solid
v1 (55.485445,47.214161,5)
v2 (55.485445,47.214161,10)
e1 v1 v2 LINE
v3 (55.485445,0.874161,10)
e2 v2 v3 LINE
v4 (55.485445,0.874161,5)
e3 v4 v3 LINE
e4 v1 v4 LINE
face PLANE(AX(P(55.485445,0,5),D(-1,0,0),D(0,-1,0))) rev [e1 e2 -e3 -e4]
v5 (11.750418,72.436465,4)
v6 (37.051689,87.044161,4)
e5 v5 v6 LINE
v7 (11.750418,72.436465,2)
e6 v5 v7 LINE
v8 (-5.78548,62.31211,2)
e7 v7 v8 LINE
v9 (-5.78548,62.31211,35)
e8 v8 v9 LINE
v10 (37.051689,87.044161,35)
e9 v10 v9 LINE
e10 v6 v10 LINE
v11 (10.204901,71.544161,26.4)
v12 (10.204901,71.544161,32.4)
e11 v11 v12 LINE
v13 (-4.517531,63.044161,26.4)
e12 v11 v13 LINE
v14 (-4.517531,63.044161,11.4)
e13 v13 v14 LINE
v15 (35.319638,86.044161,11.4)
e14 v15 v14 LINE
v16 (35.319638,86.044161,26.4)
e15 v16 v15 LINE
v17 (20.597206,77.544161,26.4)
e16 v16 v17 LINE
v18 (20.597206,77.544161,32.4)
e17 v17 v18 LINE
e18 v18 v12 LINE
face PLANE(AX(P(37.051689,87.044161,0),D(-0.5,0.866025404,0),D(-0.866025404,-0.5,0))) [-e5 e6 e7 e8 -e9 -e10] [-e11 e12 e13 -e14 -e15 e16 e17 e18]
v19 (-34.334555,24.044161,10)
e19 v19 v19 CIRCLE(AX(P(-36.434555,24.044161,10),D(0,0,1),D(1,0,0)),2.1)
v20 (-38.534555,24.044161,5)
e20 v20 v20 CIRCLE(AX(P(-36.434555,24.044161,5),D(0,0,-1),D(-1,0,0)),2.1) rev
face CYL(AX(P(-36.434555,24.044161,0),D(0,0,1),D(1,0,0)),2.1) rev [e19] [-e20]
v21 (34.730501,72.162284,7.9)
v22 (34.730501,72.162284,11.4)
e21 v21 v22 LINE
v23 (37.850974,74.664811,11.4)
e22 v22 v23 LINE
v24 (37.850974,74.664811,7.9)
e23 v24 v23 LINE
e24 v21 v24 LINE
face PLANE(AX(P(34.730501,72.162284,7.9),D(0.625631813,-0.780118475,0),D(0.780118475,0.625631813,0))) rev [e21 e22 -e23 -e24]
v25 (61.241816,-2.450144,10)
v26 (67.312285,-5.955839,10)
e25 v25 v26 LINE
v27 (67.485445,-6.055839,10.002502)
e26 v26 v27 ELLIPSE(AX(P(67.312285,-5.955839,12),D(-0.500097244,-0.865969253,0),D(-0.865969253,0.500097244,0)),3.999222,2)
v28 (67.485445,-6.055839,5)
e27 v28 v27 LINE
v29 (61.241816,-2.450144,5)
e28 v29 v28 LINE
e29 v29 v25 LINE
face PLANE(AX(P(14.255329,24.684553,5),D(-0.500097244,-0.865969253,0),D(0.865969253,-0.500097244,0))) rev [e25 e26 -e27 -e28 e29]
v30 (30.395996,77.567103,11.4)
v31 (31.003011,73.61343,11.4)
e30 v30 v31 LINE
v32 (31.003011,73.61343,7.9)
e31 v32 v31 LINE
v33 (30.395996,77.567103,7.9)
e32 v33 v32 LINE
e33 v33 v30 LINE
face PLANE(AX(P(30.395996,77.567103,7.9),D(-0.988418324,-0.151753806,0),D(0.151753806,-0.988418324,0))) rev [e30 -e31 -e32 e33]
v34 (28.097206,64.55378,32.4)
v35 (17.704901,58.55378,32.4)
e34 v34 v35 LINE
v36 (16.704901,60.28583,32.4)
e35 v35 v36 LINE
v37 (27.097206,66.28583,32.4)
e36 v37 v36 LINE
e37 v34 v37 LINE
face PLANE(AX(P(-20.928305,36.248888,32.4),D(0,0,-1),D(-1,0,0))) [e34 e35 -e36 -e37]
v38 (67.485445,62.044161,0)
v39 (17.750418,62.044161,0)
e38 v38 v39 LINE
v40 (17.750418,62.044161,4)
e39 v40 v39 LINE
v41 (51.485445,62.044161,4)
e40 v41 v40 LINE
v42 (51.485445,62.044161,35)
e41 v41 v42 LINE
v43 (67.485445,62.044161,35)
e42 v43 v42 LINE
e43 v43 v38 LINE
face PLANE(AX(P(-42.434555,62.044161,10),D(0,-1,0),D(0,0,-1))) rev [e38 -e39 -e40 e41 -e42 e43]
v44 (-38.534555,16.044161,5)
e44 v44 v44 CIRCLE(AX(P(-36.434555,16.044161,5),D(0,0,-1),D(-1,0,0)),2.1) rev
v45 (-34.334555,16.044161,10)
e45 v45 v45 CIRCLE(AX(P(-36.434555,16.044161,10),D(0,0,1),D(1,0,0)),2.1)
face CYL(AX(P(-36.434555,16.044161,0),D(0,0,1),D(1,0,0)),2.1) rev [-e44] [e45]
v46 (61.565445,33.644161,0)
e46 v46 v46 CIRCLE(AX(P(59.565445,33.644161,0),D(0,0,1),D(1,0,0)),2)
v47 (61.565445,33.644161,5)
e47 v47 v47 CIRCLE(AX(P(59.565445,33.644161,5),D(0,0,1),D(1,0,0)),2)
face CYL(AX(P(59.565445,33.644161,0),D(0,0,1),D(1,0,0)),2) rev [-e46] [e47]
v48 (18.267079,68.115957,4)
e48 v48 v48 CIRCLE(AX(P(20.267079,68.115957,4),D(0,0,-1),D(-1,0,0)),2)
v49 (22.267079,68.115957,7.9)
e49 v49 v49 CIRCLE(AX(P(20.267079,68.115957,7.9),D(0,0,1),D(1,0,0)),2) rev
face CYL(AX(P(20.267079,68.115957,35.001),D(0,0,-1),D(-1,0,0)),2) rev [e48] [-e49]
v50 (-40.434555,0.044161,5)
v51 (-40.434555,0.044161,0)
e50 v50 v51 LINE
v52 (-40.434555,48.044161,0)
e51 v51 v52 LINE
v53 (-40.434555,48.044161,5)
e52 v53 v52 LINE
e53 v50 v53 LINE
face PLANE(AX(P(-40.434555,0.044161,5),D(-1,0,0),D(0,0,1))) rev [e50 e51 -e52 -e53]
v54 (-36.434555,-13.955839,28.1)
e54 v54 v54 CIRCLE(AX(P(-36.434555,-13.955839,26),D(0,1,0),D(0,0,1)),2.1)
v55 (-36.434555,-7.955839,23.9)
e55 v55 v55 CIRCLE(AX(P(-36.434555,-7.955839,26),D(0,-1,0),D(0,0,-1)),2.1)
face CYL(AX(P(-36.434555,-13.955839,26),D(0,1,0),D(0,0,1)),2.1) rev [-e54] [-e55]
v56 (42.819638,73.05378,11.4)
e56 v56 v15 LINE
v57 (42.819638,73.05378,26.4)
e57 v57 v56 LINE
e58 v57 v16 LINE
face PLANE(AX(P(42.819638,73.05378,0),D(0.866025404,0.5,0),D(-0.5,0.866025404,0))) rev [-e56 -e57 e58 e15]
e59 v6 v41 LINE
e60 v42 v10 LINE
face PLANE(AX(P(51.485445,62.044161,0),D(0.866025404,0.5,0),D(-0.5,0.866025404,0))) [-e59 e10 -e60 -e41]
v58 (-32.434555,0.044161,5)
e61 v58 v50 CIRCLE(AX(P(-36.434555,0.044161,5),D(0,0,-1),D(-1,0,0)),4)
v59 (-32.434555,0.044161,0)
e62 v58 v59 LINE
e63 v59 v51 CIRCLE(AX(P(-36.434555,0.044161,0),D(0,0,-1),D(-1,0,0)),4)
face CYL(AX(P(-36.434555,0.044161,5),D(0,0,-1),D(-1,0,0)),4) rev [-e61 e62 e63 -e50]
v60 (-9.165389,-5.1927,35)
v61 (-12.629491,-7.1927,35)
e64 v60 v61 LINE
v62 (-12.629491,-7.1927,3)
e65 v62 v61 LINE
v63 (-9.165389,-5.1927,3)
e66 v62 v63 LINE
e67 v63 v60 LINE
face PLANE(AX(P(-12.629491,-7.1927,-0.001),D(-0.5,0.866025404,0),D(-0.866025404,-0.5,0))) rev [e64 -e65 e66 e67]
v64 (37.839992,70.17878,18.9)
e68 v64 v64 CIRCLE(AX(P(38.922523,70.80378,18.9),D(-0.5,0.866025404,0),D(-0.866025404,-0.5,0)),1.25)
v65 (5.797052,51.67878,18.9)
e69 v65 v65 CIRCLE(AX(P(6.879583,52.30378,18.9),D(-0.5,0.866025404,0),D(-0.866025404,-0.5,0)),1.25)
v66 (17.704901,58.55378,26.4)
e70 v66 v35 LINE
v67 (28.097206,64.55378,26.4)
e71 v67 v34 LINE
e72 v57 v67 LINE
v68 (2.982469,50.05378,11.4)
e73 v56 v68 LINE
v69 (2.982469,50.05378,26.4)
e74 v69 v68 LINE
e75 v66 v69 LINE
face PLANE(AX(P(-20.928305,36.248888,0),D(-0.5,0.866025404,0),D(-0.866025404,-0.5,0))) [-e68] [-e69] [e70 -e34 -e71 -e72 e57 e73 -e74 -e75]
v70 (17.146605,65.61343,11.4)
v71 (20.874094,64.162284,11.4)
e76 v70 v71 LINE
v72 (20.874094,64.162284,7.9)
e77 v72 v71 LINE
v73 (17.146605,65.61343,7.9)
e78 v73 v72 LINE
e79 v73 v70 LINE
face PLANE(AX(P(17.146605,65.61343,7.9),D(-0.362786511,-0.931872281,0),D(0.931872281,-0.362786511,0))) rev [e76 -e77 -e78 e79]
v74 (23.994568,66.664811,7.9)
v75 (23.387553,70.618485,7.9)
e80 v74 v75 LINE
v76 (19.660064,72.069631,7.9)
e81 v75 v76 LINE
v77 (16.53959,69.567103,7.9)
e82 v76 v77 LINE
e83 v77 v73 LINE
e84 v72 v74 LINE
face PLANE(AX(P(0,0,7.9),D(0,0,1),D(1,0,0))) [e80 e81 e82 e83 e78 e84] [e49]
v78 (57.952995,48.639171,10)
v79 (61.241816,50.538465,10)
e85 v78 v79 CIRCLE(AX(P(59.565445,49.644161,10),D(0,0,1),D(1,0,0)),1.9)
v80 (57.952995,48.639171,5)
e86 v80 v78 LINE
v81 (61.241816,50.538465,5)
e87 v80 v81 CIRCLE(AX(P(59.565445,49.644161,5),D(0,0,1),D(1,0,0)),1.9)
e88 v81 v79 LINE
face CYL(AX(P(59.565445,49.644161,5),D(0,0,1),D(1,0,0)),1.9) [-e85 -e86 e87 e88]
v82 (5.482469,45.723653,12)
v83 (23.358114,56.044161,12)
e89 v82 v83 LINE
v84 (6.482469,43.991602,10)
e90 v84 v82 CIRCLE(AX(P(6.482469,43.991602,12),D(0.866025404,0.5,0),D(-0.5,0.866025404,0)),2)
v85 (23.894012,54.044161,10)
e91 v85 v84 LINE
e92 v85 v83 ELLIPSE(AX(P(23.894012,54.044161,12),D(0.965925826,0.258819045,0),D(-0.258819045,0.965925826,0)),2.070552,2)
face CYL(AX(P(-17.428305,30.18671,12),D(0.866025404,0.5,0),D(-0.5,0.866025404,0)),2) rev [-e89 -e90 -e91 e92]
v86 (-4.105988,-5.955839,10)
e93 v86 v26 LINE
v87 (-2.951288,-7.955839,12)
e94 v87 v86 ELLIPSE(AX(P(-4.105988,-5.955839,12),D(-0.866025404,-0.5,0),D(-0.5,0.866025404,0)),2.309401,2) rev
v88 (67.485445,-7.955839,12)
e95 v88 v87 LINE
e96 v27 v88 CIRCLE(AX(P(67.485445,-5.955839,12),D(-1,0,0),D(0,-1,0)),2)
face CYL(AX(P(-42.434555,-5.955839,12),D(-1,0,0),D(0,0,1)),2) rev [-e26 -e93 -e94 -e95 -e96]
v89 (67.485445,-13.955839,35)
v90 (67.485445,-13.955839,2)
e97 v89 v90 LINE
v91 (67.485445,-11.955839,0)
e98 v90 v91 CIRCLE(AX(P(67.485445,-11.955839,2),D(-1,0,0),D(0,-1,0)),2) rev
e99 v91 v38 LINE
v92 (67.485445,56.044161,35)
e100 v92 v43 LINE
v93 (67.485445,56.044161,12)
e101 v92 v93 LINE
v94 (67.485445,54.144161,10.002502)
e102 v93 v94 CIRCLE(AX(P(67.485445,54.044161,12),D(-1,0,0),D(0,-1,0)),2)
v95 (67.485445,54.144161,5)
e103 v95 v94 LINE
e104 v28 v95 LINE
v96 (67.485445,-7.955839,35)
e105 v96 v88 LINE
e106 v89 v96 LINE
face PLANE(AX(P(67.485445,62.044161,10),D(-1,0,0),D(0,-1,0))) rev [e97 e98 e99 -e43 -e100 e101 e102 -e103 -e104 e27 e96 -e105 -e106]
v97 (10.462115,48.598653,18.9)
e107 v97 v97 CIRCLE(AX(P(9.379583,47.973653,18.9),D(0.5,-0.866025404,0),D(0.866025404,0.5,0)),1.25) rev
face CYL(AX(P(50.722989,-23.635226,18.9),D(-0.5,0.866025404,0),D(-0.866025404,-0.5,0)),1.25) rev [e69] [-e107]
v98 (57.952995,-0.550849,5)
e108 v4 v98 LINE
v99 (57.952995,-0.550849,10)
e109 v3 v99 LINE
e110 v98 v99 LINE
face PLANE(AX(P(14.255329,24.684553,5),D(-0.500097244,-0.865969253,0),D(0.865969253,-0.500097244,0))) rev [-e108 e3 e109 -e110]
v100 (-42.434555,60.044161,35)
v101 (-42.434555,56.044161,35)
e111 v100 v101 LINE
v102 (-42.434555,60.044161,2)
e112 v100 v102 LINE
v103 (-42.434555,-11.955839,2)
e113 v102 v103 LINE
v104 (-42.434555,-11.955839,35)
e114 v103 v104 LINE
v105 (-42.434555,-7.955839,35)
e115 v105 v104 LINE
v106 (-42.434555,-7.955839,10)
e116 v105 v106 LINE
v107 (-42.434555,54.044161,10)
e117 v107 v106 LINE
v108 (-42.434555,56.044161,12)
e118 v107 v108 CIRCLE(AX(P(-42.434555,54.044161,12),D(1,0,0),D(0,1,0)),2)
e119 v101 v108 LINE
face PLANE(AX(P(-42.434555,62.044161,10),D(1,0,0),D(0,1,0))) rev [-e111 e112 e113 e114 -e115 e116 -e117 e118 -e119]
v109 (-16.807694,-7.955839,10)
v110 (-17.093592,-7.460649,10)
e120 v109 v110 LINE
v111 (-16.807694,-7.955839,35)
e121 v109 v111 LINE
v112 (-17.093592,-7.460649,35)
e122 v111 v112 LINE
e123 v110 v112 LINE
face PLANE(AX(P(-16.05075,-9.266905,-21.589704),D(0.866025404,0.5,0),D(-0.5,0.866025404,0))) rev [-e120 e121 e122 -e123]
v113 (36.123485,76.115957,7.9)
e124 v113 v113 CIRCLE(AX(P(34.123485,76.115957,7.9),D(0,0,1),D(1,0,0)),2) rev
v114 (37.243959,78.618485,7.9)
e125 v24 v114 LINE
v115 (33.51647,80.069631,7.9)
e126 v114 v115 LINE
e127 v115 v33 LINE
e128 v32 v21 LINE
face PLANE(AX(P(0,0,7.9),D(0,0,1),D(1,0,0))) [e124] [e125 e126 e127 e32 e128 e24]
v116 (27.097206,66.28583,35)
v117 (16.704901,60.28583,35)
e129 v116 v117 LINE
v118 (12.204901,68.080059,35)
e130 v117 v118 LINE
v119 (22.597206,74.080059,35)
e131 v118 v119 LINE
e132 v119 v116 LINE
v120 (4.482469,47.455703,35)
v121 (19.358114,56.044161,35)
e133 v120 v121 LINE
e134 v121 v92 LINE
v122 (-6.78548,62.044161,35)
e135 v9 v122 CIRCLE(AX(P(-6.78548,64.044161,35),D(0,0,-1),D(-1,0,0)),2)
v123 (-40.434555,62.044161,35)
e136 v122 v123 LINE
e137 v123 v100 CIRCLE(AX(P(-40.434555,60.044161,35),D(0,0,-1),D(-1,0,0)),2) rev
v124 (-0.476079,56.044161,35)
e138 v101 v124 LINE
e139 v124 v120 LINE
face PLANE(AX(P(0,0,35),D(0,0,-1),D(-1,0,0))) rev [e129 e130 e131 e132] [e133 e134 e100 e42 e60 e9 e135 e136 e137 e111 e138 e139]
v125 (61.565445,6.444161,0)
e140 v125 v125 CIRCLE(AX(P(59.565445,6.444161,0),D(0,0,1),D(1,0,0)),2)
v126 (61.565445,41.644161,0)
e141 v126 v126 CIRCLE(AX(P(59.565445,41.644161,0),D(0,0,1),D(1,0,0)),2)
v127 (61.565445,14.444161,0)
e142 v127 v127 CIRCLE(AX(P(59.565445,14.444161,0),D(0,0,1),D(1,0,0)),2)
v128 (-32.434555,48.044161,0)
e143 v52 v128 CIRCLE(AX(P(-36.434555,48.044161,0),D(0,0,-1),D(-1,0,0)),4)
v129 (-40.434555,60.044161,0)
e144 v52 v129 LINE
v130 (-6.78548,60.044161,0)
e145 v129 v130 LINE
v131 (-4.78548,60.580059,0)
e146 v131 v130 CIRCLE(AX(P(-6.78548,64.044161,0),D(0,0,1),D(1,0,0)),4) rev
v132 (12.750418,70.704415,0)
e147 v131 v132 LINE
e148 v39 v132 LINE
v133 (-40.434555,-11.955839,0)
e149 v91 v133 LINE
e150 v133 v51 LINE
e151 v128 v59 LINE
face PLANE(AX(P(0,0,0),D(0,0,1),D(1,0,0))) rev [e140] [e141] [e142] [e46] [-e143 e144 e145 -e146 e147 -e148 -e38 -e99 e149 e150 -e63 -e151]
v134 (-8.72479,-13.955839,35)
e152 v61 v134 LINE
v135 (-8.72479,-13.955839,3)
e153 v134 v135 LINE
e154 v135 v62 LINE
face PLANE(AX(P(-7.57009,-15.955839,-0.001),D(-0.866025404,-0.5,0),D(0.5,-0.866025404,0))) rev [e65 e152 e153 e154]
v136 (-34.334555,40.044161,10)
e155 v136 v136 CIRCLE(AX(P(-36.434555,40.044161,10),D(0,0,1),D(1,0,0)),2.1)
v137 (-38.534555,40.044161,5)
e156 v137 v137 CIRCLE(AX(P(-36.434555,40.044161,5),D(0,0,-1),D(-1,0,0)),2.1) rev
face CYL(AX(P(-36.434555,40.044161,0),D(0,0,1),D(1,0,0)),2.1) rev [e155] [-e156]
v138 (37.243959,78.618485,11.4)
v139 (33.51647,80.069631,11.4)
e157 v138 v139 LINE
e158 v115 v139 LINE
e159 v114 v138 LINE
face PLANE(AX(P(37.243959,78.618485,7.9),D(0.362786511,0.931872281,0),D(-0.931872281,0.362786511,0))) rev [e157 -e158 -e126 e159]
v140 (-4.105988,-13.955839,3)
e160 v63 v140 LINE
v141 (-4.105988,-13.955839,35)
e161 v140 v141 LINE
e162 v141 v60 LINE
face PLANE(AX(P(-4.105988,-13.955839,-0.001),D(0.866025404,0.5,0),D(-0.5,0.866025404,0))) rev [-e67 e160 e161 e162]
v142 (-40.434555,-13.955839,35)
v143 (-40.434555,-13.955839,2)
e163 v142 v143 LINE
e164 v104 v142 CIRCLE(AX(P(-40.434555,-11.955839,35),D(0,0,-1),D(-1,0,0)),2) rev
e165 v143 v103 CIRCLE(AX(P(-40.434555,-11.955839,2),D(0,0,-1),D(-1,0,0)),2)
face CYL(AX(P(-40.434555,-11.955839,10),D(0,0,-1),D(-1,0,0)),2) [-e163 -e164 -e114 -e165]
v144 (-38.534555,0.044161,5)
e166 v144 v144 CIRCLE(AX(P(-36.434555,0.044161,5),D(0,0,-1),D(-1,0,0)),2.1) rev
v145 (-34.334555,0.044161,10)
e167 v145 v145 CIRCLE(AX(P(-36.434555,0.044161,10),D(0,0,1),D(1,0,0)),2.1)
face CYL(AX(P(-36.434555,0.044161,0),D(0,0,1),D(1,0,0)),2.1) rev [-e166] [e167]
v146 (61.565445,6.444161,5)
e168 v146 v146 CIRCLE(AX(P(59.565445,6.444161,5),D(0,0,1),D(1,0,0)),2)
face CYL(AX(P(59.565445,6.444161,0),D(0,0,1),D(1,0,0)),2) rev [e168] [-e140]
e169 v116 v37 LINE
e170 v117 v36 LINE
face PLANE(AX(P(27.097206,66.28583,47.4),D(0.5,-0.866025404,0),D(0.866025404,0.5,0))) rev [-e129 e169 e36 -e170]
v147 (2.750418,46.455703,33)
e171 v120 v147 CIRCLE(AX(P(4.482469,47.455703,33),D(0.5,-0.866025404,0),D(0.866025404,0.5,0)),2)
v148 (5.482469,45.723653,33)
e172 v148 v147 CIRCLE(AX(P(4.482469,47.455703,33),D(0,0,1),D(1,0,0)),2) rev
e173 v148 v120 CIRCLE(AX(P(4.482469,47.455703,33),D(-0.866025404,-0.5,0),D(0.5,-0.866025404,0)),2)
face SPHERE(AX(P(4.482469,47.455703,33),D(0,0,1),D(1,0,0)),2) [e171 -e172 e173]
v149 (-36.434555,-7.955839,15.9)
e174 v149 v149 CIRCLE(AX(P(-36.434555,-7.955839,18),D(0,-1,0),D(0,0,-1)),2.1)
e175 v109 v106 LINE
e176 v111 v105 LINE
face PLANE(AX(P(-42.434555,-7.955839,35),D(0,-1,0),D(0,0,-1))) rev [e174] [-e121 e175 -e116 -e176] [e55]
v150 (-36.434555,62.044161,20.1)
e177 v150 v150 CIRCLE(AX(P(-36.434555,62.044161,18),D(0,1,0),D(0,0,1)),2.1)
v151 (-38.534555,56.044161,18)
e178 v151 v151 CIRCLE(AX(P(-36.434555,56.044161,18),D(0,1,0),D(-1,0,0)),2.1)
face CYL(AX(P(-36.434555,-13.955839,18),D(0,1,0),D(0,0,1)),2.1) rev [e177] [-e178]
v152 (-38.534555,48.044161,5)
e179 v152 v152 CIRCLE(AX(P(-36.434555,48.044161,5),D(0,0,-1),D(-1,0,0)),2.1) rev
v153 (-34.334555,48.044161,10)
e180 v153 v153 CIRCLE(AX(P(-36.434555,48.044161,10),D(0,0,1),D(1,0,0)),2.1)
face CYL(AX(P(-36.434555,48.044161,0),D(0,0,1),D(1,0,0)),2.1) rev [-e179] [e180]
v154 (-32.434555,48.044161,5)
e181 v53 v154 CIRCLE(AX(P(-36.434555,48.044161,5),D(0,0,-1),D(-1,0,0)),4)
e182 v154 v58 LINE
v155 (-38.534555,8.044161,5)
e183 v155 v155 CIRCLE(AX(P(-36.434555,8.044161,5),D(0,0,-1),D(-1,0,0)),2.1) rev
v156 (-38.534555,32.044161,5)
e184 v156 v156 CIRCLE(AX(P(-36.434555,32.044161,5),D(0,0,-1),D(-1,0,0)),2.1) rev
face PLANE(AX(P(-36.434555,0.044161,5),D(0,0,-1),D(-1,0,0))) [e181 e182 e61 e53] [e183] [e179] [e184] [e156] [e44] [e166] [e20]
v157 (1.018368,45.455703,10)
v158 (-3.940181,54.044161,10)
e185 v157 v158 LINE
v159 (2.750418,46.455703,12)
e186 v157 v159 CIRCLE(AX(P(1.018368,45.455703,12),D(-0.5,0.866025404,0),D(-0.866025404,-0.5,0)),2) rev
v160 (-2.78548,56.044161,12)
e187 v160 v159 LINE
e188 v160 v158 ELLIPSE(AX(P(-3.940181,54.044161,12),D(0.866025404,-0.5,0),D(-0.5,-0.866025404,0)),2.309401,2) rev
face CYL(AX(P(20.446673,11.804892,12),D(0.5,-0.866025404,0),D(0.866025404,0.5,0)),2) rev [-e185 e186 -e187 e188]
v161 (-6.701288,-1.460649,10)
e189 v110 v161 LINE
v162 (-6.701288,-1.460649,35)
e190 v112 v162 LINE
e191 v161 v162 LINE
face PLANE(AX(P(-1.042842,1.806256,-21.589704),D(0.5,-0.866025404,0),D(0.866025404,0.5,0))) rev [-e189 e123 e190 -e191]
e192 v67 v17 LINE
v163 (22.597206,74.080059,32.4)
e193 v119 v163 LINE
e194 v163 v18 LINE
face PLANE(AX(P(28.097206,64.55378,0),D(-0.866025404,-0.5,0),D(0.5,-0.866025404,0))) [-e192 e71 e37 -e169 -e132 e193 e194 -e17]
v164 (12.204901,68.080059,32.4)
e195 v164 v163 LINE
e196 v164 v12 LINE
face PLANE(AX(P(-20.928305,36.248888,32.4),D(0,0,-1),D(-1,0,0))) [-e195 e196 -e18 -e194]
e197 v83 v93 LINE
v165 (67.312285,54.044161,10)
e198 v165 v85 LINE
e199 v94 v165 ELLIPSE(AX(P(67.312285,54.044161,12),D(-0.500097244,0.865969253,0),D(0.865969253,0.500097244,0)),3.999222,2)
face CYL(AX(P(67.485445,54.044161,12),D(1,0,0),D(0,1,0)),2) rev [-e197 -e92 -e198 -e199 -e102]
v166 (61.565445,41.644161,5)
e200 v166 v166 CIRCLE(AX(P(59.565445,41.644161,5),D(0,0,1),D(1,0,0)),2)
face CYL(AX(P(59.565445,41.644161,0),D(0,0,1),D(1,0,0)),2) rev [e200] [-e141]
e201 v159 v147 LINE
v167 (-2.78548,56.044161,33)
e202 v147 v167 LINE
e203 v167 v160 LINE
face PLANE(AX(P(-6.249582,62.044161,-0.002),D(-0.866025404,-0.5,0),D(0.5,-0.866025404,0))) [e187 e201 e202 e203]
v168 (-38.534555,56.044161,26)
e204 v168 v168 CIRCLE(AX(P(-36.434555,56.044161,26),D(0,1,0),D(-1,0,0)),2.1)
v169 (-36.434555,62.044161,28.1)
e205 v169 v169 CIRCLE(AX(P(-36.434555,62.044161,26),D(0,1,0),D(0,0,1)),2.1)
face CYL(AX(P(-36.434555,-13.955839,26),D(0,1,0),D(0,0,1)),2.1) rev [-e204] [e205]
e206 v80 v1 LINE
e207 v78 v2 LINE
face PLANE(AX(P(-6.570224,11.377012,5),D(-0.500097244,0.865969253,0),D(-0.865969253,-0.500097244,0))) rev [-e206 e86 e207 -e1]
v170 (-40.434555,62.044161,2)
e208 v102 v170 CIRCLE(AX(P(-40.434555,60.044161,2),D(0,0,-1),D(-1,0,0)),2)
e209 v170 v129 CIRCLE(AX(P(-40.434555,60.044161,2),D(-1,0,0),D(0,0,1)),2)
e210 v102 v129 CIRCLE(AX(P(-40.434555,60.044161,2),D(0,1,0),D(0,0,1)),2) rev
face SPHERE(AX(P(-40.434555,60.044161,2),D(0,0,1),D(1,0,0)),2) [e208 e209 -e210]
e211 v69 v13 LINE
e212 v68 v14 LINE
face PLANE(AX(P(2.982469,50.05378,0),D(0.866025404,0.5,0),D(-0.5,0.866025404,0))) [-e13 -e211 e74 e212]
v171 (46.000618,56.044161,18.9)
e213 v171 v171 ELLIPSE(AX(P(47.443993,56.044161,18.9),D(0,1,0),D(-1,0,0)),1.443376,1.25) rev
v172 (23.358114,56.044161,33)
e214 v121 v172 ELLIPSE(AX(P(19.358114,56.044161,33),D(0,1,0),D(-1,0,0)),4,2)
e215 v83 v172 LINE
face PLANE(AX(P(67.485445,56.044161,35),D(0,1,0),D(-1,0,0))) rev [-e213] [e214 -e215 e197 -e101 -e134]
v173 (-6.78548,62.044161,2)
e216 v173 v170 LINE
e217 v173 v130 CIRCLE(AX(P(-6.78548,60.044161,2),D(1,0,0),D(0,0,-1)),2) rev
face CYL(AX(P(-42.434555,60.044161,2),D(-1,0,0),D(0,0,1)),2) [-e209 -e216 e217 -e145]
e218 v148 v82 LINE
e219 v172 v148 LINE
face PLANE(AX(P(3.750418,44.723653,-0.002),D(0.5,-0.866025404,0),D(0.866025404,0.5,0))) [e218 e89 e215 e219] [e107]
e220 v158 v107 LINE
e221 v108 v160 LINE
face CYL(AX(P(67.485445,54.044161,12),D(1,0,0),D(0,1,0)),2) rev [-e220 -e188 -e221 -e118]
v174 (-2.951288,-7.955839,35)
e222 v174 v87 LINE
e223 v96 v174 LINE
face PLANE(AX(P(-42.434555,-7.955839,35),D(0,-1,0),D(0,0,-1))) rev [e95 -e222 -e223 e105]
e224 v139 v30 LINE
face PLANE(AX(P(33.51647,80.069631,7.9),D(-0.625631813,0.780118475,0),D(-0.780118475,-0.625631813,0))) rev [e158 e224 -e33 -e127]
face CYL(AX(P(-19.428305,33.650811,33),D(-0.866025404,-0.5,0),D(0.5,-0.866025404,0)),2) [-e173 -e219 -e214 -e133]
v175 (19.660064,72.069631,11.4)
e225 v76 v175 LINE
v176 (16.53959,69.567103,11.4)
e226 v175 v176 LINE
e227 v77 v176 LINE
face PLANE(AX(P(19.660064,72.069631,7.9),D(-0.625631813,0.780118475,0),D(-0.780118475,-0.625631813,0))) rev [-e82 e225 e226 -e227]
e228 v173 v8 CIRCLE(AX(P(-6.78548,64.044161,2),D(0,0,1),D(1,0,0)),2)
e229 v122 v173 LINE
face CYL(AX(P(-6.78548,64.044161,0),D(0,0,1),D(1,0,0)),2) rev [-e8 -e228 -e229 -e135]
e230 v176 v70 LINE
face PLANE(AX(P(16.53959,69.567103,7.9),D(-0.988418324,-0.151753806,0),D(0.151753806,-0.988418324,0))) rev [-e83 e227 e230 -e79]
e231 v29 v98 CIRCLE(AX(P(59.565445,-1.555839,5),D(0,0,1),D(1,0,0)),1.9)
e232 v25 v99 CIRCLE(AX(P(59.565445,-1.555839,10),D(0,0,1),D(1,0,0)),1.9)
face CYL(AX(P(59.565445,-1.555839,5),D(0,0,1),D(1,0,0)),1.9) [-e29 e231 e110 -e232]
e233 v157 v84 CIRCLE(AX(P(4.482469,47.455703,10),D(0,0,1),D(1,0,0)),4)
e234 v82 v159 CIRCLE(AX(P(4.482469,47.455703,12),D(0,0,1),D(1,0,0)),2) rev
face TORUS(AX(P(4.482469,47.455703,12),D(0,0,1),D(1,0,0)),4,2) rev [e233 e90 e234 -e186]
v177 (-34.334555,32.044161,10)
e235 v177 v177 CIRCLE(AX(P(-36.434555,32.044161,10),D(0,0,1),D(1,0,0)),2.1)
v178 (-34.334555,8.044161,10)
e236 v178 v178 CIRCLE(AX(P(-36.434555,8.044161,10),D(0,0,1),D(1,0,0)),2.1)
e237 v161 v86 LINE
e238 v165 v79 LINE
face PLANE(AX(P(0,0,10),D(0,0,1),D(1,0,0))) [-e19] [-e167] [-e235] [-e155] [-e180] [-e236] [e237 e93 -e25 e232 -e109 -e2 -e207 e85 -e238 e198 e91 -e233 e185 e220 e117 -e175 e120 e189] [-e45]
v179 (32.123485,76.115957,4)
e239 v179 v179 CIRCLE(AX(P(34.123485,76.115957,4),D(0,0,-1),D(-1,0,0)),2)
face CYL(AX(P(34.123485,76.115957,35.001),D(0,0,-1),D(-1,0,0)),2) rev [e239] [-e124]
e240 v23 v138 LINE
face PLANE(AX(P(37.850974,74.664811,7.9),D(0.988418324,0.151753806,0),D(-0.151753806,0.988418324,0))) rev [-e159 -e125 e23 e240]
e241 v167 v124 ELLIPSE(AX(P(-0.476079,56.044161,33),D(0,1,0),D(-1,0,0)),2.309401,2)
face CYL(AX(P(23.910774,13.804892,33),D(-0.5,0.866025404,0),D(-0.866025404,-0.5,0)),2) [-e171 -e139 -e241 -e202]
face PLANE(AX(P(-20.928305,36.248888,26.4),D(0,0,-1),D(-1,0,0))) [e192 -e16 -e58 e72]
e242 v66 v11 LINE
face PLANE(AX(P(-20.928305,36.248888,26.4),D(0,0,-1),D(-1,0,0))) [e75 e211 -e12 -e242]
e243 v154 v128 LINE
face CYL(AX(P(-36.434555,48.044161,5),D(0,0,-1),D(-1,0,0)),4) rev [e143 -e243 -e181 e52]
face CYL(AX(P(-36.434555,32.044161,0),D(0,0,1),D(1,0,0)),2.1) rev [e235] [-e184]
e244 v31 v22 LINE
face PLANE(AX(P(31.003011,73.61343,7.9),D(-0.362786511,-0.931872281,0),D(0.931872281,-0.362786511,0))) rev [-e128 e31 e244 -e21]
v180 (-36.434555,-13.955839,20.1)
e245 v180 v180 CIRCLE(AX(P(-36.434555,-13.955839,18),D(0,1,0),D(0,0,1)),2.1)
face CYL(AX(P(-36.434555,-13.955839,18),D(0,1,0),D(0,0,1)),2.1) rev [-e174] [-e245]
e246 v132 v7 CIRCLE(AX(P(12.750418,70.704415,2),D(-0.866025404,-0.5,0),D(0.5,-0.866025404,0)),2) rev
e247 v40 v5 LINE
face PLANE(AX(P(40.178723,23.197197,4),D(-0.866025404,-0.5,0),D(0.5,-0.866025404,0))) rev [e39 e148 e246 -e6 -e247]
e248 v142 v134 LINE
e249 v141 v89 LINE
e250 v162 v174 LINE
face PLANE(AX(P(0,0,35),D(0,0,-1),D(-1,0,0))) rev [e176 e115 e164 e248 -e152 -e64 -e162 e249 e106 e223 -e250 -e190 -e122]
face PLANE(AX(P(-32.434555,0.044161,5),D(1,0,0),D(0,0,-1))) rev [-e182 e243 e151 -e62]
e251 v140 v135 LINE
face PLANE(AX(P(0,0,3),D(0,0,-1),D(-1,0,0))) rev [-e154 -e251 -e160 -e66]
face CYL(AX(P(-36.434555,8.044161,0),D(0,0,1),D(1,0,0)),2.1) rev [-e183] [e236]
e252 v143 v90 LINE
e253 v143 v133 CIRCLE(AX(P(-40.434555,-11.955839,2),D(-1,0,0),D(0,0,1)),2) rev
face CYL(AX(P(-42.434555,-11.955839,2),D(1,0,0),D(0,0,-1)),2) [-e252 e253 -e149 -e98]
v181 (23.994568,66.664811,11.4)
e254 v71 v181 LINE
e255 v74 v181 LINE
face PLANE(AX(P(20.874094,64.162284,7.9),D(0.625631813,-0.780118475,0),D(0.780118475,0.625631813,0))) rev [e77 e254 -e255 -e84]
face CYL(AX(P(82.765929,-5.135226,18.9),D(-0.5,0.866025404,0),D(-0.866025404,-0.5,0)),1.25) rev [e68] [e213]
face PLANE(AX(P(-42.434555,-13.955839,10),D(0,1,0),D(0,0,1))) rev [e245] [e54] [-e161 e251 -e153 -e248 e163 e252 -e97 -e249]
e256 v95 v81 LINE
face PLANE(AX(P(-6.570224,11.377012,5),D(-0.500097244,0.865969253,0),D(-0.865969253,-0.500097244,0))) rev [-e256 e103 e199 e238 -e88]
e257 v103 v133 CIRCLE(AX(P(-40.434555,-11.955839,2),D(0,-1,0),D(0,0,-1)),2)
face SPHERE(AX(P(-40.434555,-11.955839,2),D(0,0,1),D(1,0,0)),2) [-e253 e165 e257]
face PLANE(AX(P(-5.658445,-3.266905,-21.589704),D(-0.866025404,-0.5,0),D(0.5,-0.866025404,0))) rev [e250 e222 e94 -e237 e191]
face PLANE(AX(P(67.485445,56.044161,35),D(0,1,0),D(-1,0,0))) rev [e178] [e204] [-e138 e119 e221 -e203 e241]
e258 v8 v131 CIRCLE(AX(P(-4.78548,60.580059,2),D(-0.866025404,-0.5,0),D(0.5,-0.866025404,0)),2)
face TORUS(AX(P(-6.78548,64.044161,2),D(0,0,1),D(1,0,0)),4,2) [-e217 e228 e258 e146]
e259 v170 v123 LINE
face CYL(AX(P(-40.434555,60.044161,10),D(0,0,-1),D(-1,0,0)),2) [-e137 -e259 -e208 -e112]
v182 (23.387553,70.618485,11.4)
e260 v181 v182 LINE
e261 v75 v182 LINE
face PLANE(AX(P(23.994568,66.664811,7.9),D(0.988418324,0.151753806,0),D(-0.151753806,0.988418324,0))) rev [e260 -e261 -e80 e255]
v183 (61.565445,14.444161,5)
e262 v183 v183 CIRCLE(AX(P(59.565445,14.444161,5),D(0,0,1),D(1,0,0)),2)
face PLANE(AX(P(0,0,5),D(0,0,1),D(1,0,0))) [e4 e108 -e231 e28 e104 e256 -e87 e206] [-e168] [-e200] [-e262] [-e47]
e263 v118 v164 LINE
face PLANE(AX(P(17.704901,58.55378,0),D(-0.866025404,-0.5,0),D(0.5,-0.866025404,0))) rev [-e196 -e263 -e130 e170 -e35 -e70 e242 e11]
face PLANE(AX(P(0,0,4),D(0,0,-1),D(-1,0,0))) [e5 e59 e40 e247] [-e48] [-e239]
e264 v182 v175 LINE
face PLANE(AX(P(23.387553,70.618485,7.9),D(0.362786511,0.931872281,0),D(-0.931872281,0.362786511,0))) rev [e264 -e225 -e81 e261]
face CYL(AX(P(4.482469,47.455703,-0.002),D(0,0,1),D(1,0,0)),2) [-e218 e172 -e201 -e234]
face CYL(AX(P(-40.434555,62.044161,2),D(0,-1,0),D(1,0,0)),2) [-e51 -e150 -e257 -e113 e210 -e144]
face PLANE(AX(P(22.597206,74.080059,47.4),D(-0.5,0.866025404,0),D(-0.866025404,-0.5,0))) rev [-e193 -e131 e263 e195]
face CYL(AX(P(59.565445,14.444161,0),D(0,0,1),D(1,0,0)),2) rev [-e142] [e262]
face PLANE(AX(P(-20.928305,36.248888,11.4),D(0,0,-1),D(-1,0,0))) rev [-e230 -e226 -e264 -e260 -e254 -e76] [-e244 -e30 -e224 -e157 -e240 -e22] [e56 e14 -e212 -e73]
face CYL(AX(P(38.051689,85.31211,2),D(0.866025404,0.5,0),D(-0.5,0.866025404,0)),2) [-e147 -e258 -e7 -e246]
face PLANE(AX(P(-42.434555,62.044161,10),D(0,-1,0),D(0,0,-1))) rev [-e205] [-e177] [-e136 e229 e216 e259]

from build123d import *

# Parameters (mm, degrees)
SKETCH_2_W               = 109.92
SKETCH_2_H               = 76
EXTRUDE_1_DEPTH          = 10
CUT_EXTRUDE_1_DEPTH      = 5
SKETCH_4_R               = 2
CUT_EXTRUDE_2_DEPTH      = 92.808295873
SKETCH_5_W               = 109.92
SKETCH_5_H               = 6
EXTRUDE_2_DEPTH          = 25
CUT_EXTRUDE_3_DEPTH      = 104.340627651
CUT_EXTRUDE_3_DEPTH_BACK = 104.340627651
SKETCH_7_R               = 2.1
SKETCH_9_R               = 2.1
CUT_EXTRUDE_4_DEPTH      = 96.019804204
CUT_EXTRUDE_5_DEPTH      = 5
EXTRUDE_3_DEPTH          = 35
EXTRUDE_4_DEPTH          = 35
SKETCH_13_W              = 46
SKETCH_13_H              = 15
SKETCH_13_W_2            = 12
SKETCH_13_H_2            = 6
CUT_EXTRUDE_6_DEPTH      = 15
CUT_EXTRUDE_7_DEPTH      = 15
SKETCH_15_R              = 1.25
CUT_EXTRUDE_8_DEPTH      = 28.709519
EXTRUDE_5_DEPTH          = 35
CUT_EXTRUDE_10_DEPTH     = 4
CUT_EXTRUDE_11_REACH     = 116.42
SKETCH_22_R              = 2
CUT_EXTRUDE_12_DEPTH     = 3.5
CUT_EXTRUDE_14_REACH     = 117.568
EXTRUDE_6_DEPTH          = 3
FILLET_1_R               = 2


with BuildPart() as part:
    # 草圖2 → 填料-伸長1 (new body)
    with BuildSketch(Plane.XY):
        with Locations((12.52544527, 24.044160626)):
            Rectangle(SKETCH_2_W, SKETCH_2_H)
    extrude(amount=EXTRUDE_1_DEPTH)

    # 草圖3 → 除料-伸長1 (cut)
    with BuildSketch(Plane.XY.offset(10)):
        with BuildLine():
            Line((67.48544527, -6.055839374), (67.48544527, 54.144160626))
            Line((67.48544527, 54.144160626), (61.24181631, 50.538464901))
            ThreePointArc((61.24181631, 50.538464901), (61.408690367, 50.105080914), (61.46544527, 49.644160626))
            ThreePointArc((61.46544527, 49.644160626), (60.088104264, 47.81746208), (57.95299519, 48.639170705))
            Line((57.95299519, 48.639170705), (55.48544527, 47.214160626))
            Line((55.48544527, 47.214160626), (55.48544527, 0.874160626))
            Line((55.48544527, 0.874160626), (57.95299519, -0.550849453))
            ThreePointArc((57.95299519, -0.550849453), (60.088104264, 0.270859171), (61.46544527, -1.555839374))
            ThreePointArc((61.46544527, -1.555839374), (61.408690367, -2.016759663), (61.24181631, -2.45014365))
            Line((61.24181631, -2.45014365), (67.48544527, -6.055839374))
        make_face()
    extrude(amount=-CUT_EXTRUDE_1_DEPTH, mode=Mode.SUBTRACT)

    # 草圖4 → 除料-伸長2 (cut, through all)
    with BuildSketch(Plane.XY.offset(5)):
        with Locations((59.56544527, 41.644160626)):
            Circle(SKETCH_4_R)
        with Locations((59.56544527, 33.644160626)):
            Circle(SKETCH_4_R)
        with Locations((59.56544527, 6.444160626)):
            Circle(SKETCH_4_R)
        with Locations((59.56544527, 14.444160626)):
            Circle(SKETCH_4_R)
    extrude(amount=-CUT_EXTRUDE_2_DEPTH, mode=Mode.SUBTRACT)

    # 草圖5 → 填料-伸長2 (add)
    with BuildSketch(Plane.XY.offset(10)):
        with Locations((12.52544527, -10.955839374)):
            Rectangle(SKETCH_5_W, SKETCH_5_H)
        with Locations((12.52544527, 59.044160626)):
            Rectangle(SKETCH_5_W, SKETCH_5_H)
    extrude(amount=EXTRUDE_2_DEPTH)

    # 草圖7 → 除料-伸長3 (cut, two sides: drawn at the far end of the back side and taken through both)
    with BuildSketch(Plane(origin=(0, -7.955839374, 0), x_dir=(1, 0, 0), z_dir=(0, 1, 0)).offset(-CUT_EXTRUDE_3_DEPTH_BACK)):
        with Locations(Location((-36.43455473, -18, 0), (0, 0, 270))):
            Circle(SKETCH_7_R)
        with Locations(Location((-36.43455473, -26, 0), (0, 0, 270))):
            Circle(SKETCH_7_R)
    extrude(amount=CUT_EXTRUDE_3_DEPTH + CUT_EXTRUDE_3_DEPTH_BACK, mode=Mode.SUBTRACT)

    # 草圖9 → 除料-伸長4 (cut, through all)
    with BuildSketch(Plane.XY.offset(10)):
        with Locations((-36.43455473, 0.044160626)):
            Circle(SKETCH_9_R)
        with Locations((-36.43455473, 8.044160626)):
            Circle(SKETCH_9_R)
        with Locations((-36.43455473, 16.044160626)):
            Circle(SKETCH_9_R)
        with Locations((-36.43455473, 24.044160626)):
            Circle(SKETCH_9_R)
        with Locations((-36.43455473, 32.044160626)):
            Circle(SKETCH_9_R)
        with Locations((-36.43455473, 40.044160626)):
            Circle(SKETCH_9_R)
        with Locations((-36.43455473, 48.044160626)):
            Circle(SKETCH_9_R)
    extrude(amount=-CUT_EXTRUDE_4_DEPTH, mode=Mode.SUBTRACT)

    # 草圖10 → 除料-伸長5 (cut)
    with BuildSketch(Plane(origin=(0, 0, 0), x_dir=(-1, 0, 0), z_dir=(0, 0, -1))):
        with BuildLine():
            Line((32.43455473, 0.044160626), (32.43455473, 48.044160626))
            ThreePointArc((32.43455473, 48.044160626), (36.43455473, 52.044160626), (40.43455473, 48.044160626))
            Line((40.43455473, 48.044160626), (40.43455473, 0.044160626))
            ThreePointArc((40.43455473, 0.044160626), (36.43455473, -3.955839374), (32.43455473, 0.044160626))
        make_face()
    extrude(amount=-CUT_EXTRUDE_5_DEPTH, mode=Mode.SUBTRACT)

    # 草圖11 → 填料-伸長3 (add, through all)
    with BuildSketch(Plane.XY.offset(35)):
        Polygon((51.48544527, 62.044160626), (37.05168854, 87.044160626), (-6.249581649, 62.044160626), align=None)
    extrude(amount=-EXTRUDE_3_DEPTH)

    # 草圖12 → 填料-伸長4 (add)
    with BuildSketch(Plane.XY.offset(35)):
        Polygon((-6.249581649, 62.044160626), (37.05168854, 87.044160626), (47.05168854, 69.72365255), (3.750418351, 44.72365255), align=None)
    extrude(amount=-EXTRUDE_4_DEPTH)

    # 草圖13 → 除料-伸長6 (cut)
    with BuildSketch(Plane(origin=(-28.428305041, 49.239268705, 0), x_dir=(0.8660254037844416, 0.4999999999999949, 0), z_dir=(-0.4999999999999949, 0.8660254037844416, 0))):
        with Locations((50.609783842, -18.9)):
            Rectangle(SKETCH_13_W, SKETCH_13_H)
        with Locations((50.609783842, -29.4)):
            Rectangle(SKETCH_13_W_2, SKETCH_13_H_2)
    extrude(amount=-CUT_EXTRUDE_6_DEPTH, mode=Mode.SUBTRACT)

    # 草圖14 → 除料-伸長7 (cut)
    with BuildSketch(Plane(origin=(0, 0, 32.4), x_dir=(-1, 0, 0), z_dir=(0, 0, -1))):
        Polygon((-22.597205868, 74.080059011), (-27.097205868, 66.285830377), (-16.704901023, 60.285830377), (-12.204901023, 68.080059011), align=None)
    extrude(amount=-CUT_EXTRUDE_7_DEPTH, mode=Mode.SUBTRACT)

    # 草圖15 → 除料-伸長8 (cut)
    with BuildSketch(Plane(origin=(-20.928305041, 36.248887648, 0), x_dir=(0.8660254037844417, 0.4999999999999947, 0), z_dir=(-0.49999999999999484, 0.8660254037844418, 0))):
        with Locations(Location((69.109783842, -18.9, 0), (0, 0, 180))):
            Circle(SKETCH_15_R)
        with Locations(Location((32.109783842, -18.9, 0), (0, 0, 180))):
            Circle(SKETCH_15_R)
    extrude(amount=-CUT_EXTRUDE_8_DEPTH, mode=Mode.SUBTRACT)

    # 草圖18 → 填料-伸長5 (add)
    with BuildSketch(Plane.XY.offset(35)):
        Polygon((-13.593592417, -13.522826672), (-13.343592417, -13.955839374), (-8.724790263, -13.955839374), (-10.129490801, -11.522826672), align=None)
        Polygon((-17.093592417, -7.460648846), (-13.593592417, -13.522826672), (-10.129490801, -11.522826672), (-6.665389186, -9.522826672), (-3.201287571, -7.522826672), (-6.701287571, -1.460648846), align=None)
        Polygon((-3.201287571, -7.522826672), (-6.665389186, -9.522826672), (-4.10598811, -13.955839374), (0.512814044, -13.955839374), align=None)
    extrude(amount=-EXTRUDE_5_DEPTH)

    # 草圖21 → 除料-伸長10 (cut)
    with BuildSketch(Plane(origin=(0, 0, 0), x_dir=(-1, 0, 0), z_dir=(0, 0, -1))):
        Polygon((-37.05168854, 87.044160626), (-43.05168854, 76.65185578), (-51.48544527, 62.044160626), (-17.750418351, 62.044160626), (-11.750418351, 72.436465471), align=None)
    extrude(amount=-CUT_EXTRUDE_10_DEPTH, mode=Mode.SUBTRACT)

    # 草圖22 → 除料-伸長11 (cut, up to next)
    with BuildSketch(Plane(origin=(0, 0, 4), x_dir=(-1, 0, 0), z_dir=(0, 0, -1)), mode=Mode.PRIVATE) as cut_extrude_11_sk1:
        with Locations((-34.12348531, 76.115957396)):
            Circle(SKETCH_22_R)
    cut_extrude_11_tool1 = extrude(cut_extrude_11_sk1.sketch, amount=-CUT_EXTRUDE_11_REACH, mode=Mode.PRIVATE) & part.part
    # 草圖22 → 除料-伸長11 (cut, up to next)
    with BuildSketch(Plane(origin=(0, 0, 4), x_dir=(-1, 0, 0), z_dir=(0, 0, -1)), mode=Mode.PRIVATE) as cut_extrude_11_sk2:
        with Locations((-20.267078849, 68.115957396)):
            Circle(SKETCH_22_R)
    cut_extrude_11_tool2 = extrude(cut_extrude_11_sk2.sketch, amount=-CUT_EXTRUDE_11_REACH, mode=Mode.PRIVATE) & part.part
    add(cut_extrude_11_tool1.solids().sort_by_distance((34.123485, 76.115957, 4))[0], mode=Mode.SUBTRACT)
    add(cut_extrude_11_tool2.solids().sort_by_distance((20.267079, 68.115957, 4))[0], mode=Mode.SUBTRACT)

    # 草圖23 → 除料-伸長12 (cut)
    with BuildSketch(Plane.XY.offset(11.4)):
        Polygon((16.539589727, 69.567103439), (17.14660495, 65.613430145), (20.874094073, 64.162284101), (23.994567972, 66.664811352), (23.387552749, 70.618484646), (19.660063626, 72.06963069), align=None)
        Polygon((30.395996187, 77.567103439), (31.00301141, 73.613430145), (34.730500533, 72.162284101), (37.850974433, 74.664811352), (37.24395921, 78.618484646), (33.516470087, 80.06963069), align=None)
    extrude(amount=-CUT_EXTRUDE_12_DEPTH, mode=Mode.SUBTRACT)

    # 草圖24 → 除料-伸長14 (cut, up to next)
    with BuildSketch(Plane.XY.offset(35), mode=Mode.PRIVATE) as cut_extrude_14_sk1:
        Polygon((-7.570089725, -15.955839374), (-4.10598811, -13.955839374), (-9.165389186, -5.192699653), (-12.629490801, -7.192699653), align=None)
    cut_extrude_14_tool1 = extrude(cut_extrude_14_sk1.sketch, amount=-CUT_EXTRUDE_14_REACH, mode=Mode.PRIVATE) & part.part
    add(cut_extrude_14_tool1.solids().sort_by_distance((-8.367739, -10.57427, 35))[0], mode=Mode.SUBTRACT)

    # 草圖25 → 填料-伸長6 (add)
    with BuildSketch(Plane(origin=(0, 0, 0), x_dir=(-1, 0, 0), z_dir=(0, 0, -1))):
        Polygon((8.724790263, -13.955839374), (4.10598811, -13.955839374), (9.165389186, -5.192699653), (12.629490801, -7.192699653), align=None)
    extrude(amount=-EXTRUDE_6_DEPTH)

    # 圓角1
    fillet_1_edges = [part.edges().sort_by_distance(p)[0] for p in [
        (-24.34206819, 62.044160626, 0),
        (-6.249581649, 62.044160626, 17.5),
        (45.421779388, 56.044160626, 10),
        (0.482469159, 50.383906588, 10),
        (13.554265928, 50.383906588, 10),
        (3.750418351, 44.72365255, 22.5),
        (0.482469159, 50.383906588, 35),
        (13.554265928, 50.383906588, 35),
        (2.750418351, 67.240313048, 0),
        (12.52544527, -13.955839374, 0),
        (32.267078849, -7.955839374, 10),
        (-42.43455473, 24.044160626, 0),
        (-22.610017382, 56.044160626, 10),
        (-42.43455473, 62.044160626, 17.5),
        (-42.43455473, -13.955839374, 17.5),
    ]]
    fillet(fillet_1_edges, radius=FILLET_1_R - 0.0001)  # a hair under: the kernel refuses the full size


solid = part.part
